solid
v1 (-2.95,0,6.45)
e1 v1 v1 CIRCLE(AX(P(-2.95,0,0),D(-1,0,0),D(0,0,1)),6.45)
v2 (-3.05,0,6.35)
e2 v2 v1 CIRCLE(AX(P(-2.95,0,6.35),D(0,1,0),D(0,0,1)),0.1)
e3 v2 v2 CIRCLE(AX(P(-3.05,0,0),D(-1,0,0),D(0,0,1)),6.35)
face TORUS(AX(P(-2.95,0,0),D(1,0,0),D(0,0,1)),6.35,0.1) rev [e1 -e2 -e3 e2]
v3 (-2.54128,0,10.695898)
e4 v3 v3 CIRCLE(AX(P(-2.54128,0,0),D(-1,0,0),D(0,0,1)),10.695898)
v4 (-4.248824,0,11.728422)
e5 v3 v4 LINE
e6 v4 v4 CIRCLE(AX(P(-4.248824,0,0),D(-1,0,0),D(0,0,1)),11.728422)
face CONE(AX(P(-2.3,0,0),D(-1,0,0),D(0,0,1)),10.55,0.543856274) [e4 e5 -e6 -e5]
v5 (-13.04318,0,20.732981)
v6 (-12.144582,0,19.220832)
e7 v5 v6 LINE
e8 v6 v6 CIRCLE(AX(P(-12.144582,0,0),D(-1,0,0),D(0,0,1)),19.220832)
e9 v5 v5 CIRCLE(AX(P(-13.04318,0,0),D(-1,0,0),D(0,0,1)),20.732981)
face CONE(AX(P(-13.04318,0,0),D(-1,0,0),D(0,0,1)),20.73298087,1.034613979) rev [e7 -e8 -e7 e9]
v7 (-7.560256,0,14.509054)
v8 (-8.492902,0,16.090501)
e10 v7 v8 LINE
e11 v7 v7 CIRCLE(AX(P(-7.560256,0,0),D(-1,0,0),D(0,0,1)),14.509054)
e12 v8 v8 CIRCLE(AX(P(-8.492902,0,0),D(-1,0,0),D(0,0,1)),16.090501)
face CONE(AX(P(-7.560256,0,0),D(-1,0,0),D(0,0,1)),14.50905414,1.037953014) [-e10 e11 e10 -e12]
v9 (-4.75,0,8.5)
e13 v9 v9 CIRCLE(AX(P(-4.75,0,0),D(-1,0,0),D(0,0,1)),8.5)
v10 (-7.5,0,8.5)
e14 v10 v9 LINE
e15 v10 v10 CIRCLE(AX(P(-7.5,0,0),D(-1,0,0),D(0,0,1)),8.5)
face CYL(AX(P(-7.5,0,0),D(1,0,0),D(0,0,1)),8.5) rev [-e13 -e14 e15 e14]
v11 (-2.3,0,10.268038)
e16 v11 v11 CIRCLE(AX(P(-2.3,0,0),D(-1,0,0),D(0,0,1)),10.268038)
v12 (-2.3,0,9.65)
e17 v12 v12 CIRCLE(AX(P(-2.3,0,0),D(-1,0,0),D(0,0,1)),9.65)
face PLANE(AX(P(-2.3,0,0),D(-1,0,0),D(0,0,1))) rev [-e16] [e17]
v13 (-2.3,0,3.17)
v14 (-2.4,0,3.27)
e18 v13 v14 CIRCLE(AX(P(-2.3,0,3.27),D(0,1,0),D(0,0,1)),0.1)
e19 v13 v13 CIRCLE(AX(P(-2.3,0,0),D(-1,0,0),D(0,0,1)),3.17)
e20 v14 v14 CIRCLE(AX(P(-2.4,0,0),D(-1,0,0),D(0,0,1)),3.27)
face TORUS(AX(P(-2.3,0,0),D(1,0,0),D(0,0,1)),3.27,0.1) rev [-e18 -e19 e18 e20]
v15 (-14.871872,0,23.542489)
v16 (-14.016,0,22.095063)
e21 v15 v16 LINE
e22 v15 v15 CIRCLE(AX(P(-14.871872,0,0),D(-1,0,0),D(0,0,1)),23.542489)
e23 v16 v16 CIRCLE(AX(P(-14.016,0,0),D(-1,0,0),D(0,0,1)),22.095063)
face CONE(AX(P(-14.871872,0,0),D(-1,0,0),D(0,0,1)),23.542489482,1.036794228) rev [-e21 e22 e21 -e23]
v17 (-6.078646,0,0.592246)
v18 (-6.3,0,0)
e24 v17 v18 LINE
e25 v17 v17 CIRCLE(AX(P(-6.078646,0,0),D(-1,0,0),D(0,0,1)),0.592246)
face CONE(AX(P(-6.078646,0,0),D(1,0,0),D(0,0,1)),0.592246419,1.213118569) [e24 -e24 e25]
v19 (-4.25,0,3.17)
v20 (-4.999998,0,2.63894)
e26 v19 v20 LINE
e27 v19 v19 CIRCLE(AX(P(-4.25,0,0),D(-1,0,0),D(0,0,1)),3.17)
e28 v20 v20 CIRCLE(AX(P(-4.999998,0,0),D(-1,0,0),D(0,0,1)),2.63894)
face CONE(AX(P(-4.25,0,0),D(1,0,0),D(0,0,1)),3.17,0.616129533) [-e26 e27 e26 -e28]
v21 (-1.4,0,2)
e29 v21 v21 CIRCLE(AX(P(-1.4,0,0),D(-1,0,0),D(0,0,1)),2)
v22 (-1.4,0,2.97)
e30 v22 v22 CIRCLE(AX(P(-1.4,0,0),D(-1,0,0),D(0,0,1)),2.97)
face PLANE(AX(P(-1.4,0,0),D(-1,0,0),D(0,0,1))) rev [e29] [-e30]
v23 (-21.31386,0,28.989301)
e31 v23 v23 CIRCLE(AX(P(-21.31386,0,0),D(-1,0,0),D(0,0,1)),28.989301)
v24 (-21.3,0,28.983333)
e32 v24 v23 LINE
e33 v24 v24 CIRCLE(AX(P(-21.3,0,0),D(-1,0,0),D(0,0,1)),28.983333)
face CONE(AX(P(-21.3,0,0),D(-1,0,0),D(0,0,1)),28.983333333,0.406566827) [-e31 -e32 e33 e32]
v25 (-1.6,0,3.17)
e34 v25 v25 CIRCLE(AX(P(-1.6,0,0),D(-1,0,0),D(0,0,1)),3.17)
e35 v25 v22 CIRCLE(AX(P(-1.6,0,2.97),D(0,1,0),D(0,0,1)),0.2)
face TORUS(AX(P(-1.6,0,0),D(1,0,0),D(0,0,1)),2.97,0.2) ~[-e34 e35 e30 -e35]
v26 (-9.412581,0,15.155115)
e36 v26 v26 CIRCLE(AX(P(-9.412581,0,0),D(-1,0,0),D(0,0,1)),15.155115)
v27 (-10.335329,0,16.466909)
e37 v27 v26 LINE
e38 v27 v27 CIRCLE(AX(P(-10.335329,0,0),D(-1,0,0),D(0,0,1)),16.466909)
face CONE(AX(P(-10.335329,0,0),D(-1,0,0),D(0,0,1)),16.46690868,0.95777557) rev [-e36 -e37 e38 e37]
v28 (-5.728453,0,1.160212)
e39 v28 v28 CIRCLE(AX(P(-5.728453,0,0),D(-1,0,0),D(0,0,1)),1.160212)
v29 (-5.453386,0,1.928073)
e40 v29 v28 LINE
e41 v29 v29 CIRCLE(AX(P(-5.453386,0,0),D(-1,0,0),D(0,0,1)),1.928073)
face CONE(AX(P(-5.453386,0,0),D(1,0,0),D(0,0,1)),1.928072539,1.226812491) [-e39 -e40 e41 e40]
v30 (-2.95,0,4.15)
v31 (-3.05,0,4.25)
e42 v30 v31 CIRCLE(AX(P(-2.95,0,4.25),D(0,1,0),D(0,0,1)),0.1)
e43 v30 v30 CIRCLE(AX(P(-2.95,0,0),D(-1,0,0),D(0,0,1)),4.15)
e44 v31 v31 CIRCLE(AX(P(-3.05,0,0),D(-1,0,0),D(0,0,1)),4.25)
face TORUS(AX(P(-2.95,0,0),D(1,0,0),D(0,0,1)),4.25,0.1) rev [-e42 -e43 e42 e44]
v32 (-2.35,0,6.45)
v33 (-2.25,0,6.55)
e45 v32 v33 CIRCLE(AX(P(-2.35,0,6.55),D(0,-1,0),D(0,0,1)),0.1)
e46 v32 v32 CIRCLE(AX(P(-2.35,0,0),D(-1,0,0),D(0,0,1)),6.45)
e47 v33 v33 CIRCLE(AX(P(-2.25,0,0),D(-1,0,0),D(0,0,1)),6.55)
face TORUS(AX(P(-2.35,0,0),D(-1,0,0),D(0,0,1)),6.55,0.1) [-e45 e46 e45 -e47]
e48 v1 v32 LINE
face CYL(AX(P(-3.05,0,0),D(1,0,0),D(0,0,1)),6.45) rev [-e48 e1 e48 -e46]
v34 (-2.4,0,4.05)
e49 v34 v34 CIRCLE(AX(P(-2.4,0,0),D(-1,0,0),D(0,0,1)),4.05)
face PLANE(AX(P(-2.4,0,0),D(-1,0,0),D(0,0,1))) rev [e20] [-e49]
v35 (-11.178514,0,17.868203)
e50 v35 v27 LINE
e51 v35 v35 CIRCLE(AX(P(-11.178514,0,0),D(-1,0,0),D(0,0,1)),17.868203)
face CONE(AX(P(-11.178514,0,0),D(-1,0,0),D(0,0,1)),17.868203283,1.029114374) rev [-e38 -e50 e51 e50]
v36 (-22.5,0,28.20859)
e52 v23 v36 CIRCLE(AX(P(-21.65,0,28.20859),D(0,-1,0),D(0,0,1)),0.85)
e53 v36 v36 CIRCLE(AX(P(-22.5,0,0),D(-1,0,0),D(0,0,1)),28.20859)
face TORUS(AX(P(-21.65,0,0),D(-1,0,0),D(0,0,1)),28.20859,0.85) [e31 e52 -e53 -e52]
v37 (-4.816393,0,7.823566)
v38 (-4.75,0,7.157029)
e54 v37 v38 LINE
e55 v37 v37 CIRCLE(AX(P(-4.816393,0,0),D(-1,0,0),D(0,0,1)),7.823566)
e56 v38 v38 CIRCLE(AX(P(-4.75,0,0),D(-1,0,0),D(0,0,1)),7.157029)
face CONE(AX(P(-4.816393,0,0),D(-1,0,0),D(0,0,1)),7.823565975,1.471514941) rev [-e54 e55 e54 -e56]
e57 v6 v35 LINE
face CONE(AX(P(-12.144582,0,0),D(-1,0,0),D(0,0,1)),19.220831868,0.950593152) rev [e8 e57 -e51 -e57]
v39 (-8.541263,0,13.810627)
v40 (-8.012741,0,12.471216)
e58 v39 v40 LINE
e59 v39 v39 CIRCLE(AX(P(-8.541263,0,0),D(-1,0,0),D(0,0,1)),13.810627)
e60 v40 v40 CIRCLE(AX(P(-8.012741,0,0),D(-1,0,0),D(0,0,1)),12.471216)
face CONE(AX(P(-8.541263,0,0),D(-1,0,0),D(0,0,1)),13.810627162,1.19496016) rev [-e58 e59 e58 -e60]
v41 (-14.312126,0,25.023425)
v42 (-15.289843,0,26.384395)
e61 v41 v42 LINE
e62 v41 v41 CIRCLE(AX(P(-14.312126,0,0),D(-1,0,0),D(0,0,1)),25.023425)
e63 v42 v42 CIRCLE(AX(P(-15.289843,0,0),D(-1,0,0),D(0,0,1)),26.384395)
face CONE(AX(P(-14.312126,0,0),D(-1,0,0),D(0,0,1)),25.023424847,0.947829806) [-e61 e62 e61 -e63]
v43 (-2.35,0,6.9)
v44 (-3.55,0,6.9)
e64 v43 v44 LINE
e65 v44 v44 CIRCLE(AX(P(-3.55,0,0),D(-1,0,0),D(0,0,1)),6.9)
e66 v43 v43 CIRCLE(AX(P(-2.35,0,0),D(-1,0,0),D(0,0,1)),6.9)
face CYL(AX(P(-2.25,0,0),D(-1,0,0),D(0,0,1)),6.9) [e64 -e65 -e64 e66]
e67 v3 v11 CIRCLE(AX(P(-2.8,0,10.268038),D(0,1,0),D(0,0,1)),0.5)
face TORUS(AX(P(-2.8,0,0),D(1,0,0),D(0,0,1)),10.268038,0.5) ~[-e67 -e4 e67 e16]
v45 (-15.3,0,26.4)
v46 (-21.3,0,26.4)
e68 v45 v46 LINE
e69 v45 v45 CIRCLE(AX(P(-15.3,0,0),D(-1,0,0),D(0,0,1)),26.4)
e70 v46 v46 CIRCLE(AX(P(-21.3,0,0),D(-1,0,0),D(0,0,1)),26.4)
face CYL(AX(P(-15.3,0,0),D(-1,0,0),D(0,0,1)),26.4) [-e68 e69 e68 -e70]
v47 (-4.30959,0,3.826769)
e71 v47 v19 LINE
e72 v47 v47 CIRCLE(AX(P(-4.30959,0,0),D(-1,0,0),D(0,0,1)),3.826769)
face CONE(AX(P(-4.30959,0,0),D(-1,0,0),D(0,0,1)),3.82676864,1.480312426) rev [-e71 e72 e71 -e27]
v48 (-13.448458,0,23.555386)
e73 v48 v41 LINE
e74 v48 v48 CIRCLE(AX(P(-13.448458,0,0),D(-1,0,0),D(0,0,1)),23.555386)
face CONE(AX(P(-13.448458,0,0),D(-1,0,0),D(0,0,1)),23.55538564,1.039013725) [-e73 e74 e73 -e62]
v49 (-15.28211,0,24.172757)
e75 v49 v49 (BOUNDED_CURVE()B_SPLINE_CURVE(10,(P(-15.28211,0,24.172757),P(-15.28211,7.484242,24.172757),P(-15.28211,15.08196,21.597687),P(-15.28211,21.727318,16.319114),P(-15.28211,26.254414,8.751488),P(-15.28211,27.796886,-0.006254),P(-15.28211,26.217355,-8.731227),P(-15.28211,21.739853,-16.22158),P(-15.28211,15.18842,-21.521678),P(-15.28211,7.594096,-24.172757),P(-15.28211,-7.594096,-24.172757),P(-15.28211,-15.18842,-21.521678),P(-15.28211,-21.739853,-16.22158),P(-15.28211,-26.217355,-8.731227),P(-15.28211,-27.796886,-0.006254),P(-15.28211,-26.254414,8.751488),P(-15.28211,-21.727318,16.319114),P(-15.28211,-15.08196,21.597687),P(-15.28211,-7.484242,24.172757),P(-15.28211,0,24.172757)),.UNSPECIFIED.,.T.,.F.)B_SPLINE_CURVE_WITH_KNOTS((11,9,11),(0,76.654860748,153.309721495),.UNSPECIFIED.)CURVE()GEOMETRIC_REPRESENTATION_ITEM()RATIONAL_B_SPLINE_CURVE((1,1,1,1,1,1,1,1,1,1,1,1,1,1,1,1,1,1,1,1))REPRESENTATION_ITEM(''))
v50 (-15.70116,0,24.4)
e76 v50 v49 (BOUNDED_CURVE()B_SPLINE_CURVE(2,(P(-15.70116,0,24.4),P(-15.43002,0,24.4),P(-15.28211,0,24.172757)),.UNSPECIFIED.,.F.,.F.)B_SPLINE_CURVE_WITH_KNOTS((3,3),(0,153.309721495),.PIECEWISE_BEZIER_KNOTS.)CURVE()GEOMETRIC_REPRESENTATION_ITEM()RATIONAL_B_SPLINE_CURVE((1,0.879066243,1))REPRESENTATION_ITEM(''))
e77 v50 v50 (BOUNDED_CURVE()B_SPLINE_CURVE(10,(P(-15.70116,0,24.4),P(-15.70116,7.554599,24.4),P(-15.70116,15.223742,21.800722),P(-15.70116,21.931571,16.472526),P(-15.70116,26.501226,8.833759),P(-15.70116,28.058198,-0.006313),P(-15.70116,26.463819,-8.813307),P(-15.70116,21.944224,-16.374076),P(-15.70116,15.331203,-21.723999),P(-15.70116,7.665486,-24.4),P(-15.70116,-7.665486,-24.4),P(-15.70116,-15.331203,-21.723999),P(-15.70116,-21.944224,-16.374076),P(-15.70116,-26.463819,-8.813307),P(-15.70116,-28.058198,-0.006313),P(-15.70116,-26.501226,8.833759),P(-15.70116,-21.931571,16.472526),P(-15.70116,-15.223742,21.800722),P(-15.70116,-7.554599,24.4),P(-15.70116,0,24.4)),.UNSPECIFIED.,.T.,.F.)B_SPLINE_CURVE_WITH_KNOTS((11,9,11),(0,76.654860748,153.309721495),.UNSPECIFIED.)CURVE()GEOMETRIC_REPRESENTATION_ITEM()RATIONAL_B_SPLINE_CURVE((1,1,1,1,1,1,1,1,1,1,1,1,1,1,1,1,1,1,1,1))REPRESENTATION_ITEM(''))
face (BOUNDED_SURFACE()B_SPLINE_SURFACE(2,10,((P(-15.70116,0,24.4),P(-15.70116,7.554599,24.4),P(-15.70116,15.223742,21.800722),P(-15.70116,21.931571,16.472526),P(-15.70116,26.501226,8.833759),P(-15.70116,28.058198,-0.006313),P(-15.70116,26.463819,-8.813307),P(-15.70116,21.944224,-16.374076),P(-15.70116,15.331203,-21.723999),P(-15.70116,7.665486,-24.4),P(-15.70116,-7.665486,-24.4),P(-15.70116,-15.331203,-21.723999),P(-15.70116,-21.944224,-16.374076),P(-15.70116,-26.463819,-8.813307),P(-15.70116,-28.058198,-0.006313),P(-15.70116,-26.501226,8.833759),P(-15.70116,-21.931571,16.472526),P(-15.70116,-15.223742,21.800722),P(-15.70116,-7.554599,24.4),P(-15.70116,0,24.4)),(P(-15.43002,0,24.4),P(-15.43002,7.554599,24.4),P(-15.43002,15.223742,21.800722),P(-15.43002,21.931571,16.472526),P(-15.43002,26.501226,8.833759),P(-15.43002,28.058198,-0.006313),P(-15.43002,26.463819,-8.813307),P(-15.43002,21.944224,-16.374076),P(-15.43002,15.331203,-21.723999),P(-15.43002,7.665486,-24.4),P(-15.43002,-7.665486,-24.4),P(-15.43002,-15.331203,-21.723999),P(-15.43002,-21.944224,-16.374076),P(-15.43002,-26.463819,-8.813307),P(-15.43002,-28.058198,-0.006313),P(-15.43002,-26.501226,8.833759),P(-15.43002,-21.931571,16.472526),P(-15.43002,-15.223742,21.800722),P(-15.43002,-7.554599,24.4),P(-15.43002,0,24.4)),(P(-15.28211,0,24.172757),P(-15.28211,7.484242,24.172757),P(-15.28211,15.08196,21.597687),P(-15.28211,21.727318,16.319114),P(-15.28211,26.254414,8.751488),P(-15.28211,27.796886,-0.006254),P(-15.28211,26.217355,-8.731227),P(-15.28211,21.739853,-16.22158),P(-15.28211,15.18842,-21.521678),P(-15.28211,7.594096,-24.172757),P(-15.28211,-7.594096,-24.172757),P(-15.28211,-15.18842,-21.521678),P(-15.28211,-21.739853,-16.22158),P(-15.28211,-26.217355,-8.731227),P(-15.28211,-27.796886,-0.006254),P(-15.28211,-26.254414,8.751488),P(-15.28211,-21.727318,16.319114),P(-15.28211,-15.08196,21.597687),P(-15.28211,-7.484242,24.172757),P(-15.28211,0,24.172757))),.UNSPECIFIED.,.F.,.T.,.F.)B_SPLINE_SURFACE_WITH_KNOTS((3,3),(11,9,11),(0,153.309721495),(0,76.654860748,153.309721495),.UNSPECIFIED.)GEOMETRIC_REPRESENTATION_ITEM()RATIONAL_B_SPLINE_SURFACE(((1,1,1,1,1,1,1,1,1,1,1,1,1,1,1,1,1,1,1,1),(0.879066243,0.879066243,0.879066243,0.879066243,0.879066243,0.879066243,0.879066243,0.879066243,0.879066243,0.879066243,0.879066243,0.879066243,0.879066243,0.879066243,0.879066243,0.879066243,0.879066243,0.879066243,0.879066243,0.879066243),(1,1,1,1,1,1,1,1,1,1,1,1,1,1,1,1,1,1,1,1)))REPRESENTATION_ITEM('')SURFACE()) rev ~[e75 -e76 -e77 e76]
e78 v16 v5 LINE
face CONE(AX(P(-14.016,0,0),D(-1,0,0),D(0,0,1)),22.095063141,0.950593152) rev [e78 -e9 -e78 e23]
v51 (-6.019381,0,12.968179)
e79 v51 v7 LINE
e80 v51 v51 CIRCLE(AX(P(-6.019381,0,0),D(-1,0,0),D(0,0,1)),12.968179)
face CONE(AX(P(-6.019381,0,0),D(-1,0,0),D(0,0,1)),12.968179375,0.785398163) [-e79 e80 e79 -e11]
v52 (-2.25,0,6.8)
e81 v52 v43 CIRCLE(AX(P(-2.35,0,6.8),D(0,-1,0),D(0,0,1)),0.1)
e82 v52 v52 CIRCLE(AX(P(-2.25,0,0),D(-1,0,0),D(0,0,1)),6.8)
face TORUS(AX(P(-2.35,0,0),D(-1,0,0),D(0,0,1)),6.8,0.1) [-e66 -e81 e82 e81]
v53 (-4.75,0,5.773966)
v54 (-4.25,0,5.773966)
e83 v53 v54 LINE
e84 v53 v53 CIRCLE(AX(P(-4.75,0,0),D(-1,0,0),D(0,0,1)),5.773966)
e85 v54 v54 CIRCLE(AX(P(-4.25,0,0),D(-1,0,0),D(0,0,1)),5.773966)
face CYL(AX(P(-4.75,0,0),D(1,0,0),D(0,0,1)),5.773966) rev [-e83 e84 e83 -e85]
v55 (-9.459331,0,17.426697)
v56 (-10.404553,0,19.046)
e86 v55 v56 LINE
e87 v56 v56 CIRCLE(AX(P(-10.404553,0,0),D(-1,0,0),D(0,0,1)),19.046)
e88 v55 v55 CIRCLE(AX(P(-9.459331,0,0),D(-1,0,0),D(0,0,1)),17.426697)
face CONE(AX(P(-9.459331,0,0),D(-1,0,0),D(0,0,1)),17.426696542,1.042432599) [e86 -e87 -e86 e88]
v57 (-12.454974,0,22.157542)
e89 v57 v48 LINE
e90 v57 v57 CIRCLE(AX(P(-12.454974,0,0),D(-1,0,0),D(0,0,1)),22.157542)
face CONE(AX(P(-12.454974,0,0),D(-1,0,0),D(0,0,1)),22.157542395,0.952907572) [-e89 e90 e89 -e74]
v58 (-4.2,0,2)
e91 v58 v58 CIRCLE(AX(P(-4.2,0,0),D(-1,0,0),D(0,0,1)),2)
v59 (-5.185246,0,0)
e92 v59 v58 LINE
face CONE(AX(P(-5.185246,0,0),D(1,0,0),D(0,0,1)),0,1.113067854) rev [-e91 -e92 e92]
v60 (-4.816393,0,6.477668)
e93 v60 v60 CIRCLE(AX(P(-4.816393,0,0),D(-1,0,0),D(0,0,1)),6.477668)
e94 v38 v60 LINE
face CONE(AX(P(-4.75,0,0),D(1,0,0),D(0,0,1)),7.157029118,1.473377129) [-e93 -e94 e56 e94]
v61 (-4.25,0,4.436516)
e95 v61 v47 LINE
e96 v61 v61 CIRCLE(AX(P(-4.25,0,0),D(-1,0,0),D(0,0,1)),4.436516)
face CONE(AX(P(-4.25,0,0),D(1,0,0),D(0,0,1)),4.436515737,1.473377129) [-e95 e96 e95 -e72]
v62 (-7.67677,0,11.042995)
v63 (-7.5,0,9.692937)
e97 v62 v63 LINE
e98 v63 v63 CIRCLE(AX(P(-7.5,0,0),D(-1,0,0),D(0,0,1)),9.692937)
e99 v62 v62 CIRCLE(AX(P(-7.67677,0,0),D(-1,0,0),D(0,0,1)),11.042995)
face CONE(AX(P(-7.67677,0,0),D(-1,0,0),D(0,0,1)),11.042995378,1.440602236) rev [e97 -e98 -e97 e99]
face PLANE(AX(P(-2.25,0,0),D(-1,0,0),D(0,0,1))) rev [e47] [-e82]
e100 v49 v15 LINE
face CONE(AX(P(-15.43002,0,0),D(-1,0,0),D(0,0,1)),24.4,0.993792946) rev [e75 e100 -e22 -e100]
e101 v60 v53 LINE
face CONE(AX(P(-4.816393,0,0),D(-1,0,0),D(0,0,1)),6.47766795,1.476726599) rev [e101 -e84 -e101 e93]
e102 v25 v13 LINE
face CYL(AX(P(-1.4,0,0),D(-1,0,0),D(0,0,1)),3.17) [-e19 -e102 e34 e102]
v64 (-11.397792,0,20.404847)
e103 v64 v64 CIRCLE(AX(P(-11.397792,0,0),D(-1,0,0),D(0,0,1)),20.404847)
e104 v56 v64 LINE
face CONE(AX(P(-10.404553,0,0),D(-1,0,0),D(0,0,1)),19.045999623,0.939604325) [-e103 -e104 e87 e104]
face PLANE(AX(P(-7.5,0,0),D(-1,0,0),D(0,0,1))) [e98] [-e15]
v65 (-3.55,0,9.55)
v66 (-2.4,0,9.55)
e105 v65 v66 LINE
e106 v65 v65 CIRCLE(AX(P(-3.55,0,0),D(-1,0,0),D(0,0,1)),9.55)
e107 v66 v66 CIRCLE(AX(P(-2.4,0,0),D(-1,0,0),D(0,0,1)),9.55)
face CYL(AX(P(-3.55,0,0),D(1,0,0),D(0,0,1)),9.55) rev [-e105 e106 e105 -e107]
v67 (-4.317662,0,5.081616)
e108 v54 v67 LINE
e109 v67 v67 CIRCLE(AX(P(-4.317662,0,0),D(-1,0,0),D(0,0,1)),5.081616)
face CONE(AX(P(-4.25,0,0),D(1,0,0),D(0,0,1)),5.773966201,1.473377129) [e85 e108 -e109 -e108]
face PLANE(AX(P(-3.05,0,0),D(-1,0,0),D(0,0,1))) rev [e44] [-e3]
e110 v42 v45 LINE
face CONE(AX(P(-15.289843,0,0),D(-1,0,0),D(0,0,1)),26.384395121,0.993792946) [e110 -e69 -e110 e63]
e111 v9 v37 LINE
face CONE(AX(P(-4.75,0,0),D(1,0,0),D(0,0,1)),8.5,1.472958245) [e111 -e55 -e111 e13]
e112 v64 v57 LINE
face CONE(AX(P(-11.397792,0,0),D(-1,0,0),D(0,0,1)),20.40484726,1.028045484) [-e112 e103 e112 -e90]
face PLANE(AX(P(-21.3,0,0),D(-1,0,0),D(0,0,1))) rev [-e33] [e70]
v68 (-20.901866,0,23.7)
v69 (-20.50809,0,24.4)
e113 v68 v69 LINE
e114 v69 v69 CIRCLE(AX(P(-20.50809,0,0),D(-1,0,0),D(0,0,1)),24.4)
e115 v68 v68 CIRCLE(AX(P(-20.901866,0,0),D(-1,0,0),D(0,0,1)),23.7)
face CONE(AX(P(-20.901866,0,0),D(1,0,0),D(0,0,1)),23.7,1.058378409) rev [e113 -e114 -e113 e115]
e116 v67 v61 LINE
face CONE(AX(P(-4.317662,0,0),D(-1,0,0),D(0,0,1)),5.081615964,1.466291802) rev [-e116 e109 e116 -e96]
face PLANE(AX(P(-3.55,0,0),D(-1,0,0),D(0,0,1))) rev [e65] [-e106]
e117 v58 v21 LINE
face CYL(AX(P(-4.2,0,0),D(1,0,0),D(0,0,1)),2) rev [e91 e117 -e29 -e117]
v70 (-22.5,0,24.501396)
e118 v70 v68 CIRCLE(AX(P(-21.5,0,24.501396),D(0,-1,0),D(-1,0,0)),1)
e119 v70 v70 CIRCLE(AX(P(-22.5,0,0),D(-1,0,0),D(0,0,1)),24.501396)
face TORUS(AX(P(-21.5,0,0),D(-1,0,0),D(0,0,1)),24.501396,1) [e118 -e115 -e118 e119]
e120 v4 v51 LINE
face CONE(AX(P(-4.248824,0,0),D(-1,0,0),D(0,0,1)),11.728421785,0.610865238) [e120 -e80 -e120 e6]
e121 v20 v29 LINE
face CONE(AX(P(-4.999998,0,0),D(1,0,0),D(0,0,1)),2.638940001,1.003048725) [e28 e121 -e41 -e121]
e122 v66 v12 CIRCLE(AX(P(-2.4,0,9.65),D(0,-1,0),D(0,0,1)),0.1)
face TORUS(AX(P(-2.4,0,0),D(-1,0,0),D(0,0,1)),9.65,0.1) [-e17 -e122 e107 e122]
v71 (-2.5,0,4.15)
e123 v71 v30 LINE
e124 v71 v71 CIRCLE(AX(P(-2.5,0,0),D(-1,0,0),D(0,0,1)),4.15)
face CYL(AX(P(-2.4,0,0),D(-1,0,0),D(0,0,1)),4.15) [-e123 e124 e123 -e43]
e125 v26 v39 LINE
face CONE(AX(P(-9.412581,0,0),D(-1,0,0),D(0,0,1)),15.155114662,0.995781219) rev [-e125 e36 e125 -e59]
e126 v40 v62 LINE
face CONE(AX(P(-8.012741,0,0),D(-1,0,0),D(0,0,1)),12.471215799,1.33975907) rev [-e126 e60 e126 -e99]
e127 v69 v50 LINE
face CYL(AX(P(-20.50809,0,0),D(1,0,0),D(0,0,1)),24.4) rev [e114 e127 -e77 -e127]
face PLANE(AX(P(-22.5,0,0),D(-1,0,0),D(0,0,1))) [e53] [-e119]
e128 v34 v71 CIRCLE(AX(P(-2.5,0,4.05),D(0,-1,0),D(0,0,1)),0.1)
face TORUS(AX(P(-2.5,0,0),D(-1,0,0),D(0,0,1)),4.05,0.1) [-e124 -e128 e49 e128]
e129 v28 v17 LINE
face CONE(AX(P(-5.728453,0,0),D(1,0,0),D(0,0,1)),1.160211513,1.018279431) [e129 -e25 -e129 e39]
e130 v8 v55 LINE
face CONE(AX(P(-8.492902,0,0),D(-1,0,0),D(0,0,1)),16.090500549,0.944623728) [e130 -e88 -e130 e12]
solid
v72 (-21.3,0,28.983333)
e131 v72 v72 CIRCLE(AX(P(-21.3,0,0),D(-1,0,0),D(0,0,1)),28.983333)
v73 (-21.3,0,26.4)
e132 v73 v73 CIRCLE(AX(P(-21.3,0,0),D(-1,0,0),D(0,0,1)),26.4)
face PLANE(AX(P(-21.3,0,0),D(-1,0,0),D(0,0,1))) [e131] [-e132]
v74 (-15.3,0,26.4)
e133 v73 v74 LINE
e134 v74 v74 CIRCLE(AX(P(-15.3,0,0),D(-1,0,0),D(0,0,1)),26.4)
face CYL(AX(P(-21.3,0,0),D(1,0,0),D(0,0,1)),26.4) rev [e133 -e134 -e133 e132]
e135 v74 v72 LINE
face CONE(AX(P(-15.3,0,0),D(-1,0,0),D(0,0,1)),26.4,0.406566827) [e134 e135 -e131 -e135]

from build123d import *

# Parameters (mm, degrees)
F2_R = 0.1
F3_R = 0.2
F4_R = 0.5
F5_R = 0.5
F8_R = 0.85


with BuildPart() as f1:
    # F0 (on Front) → F1 (revolve)
    with BuildSketch(Plane.XZ):
        with BuildLine():
            Line((-4.2, 2), (-1.4, 2))
            Line((-1.4, 2), (-1.4, 3.17))
            Line((-1.4, 3.17), (-2.4, 3.17))
            Line((-2.4, 3.17), (-2.4, 4.15))
            Line((-2.4, 4.15), (-3.05, 4.15))
            Line((-3.05, 4.15), (-3.05, 6.45))
            Line((-3.05, 6.45), (-2.25, 6.45))
            Line((-2.25, 6.45), (-2.25, 6.9))
            Line((-2.25, 6.9), (-3.55, 6.9))
            Line((-3.55, 6.9), (-3.55, 9.55))
            Line((-3.55, 9.55), (-2.3, 9.55))
            Line((-2.3, 9.55), (-2.3, 10.55))
            Line((-2.3, 10.55), (-4.2488235049, 11.7284217849))
            Line((-4.2488235049, 11.7284217849), (-6.0193808361, 12.9681793751))
            Line((-6.0193808361, 12.9681793751), (-7.5602556007, 14.5090541396))
            Line((-7.5602556007, 14.5090541396), (-9.4593313096, 17.4266965415))
            Line((-9.4593313096, 17.4266965415), (-11.397791514, 20.4048472599))
            Line((-11.397791514, 20.4048472599), (-13.4484577999, 23.5553856402))
            Line((-13.4484577999, 23.5553856402), (-15.2898428789, 26.3843951207))
            Line((-15.2898428789, 26.3843951207), (-15.3, 26.4))
            Line((-15.3, 26.4), (-21.3, 26.4))
            Line((-21.3, 26.4), (-21.3, 28.9833333333))
            Line((-21.3, 28.9833333333), (-22.5, 29.5))
            Line((-22.5, 29.5), (-22.5, 24.5013962977))
            ThreePointArc((-22.5, 24.5013962977), (-21.9482556511, 23.6074908938), (-20.9018662575, 23.7))
            Line((-20.9018662575, 23.7), (-20.5080900341, 24.4))
            Line((-20.5080900341, 24.4), (-15.4300203026, 24.4))
            Line((-15.4300203026, 24.4), (-14.8718719174, 23.5424894817))
            Line((-14.8718719174, 23.5424894817), (-13.0431798353, 20.7329808699))
            Line((-13.0431798353, 20.7329808699), (-11.1785135129, 17.8682032825))
            Line((-11.1785135129, 17.8682032825), (-9.4125806174, 15.1551146623))
            Line((-9.4125806174, 15.1551146623), (-8.5412627086, 13.8106271625))
            Line((-8.5412627086, 13.8106271625), (-8.0127408728, 12.4712157995))
            Line((-8.0127408728, 12.4712157995), (-7.6767695136, 11.0429953784))
            Line((-7.6767695136, 11.0429953784), (-7.5, 9.6929371357))
            Line((-7.5, 9.6929371357), (-7.5, 8.5))
            Line((-7.5, 8.5), (-4.75, 8.5))
            Line((-4.75, 8.5), (-4.8163929872, 7.8235659748))
            Line((-4.8163929872, 7.8235659748), (-4.75, 7.1570291184))
            Line((-4.75, 7.1570291184), (-4.8163929872, 6.4776679501))
            Line((-4.8163929872, 6.4776679501), (-4.75, 5.7739662006))
            Line((-4.75, 5.7739662006), (-4.25, 5.7739662006))
            Line((-4.25, 5.7739662006), (-4.3176623901, 5.0816159641))
            Line((-4.3176623901, 5.0816159641), (-4.25, 4.4365157373))
            Line((-4.25, 4.4365157373), (-4.3095897044, 3.8267686403))
            Line((-4.3095897044, 3.8267686403), (-4.25, 3.17))
            Line((-4.25, 3.17), (-4.9999979152, 2.6389400014))
            Line((-4.9999979152, 2.6389400014), (-5.4533858784, 1.9280725392))
            Line((-5.4533858784, 1.9280725392), (-5.7284533243, 1.1602115126))
            Line((-5.7284533243, 1.1602115126), (-6.078645587, 0.5922464188))
            Line((-6.078645587, 0.5922464188), (-6.3, 0))
            Line((-6.3, 0), (-5.1852456548, 0))
            Line((-5.1852456548, 0), (-4.2, 2))
        make_face()
        Polygon((-9.4593313096, 17.4266965415), (-7.5602556007, 14.5090541396), (-8.4929022586, 16.0905005494), align=None)
        Polygon((-11.397791514, 20.4048472599), (-9.4593313096, 17.4266965415), (-10.4045527072, 19.0459996231), align=None)
        Polygon((-13.4484577999, 23.5553856402), (-11.397791514, 20.4048472599), (-12.4549735292, 22.1575423946), align=None)
        Polygon((-15.2898428789, 26.3843951207), (-13.4484577999, 23.5553856402), (-14.3121259439, 25.0234248466), align=None)
        Polygon((-10.3353289936, 16.4669086803), (-9.4125806174, 15.1551146623), (-11.1785135129, 17.8682032825), align=None)
        Polygon((-12.1445821899, 19.2208318679), (-11.1785135129, 17.8682032825), (-13.0431798353, 20.7329808699), align=None)
        Polygon((-14.0160004839, 22.095063141), (-13.0431798353, 20.7329808699), (-14.8718719174, 23.5424894817), align=None)
    revolve(axis=Axis((-5.7426228274, 0, 0), (-1, 0, 0)))

    # F2
    f2_edges = [f1.edges().sort_by_distance(p)[0] for p in [
        (-2.4, 0, -4.15),
        (-3.05, 0, -4.15),
        (-2.25, 0, -6.45),
        (-2.25, 0, -6.9),
        (-2.3, 0, -9.55),
        (-3.05, 0, -6.45),
        (-2.4, 0, -3.17),
    ]]
    fillet(f2_edges, radius=F2_R)

    # F3
    f3_edges = [f1.edges().sort_by_distance(p)[0] for p in [
        (-1.4, 0, -3.17),
    ]]
    fillet(f3_edges, radius=F3_R)

    # F4
    f4_edges = [f1.edges().sort_by_distance(p)[0] for p in [
        (-15.43002, 0, -24.4),
    ]]
    fillet(f4_edges, radius=F4_R)

    # F5
    f5_edges = [f1.edges().sort_by_distance(p)[0] for p in [
        (-2.3, 0, -10.55),
    ]]
    fillet(f5_edges, radius=F5_R)

    # F8
    f8_edges = [f1.edges().sort_by_distance(p)[0] for p in [
        (-22.5, 0, -29.5),
    ]]
    fillet(f8_edges, radius=F8_R)


with BuildPart() as f7:
    # F6 (on Front) → F7 (revolve)
    with BuildSketch(Plane.XZ):
        Polygon((-21.3, 28.9833333333), (-21.3, 26.4), (-15.3, 26.4), align=None)
    revolve(axis=Axis((-13.7036303058, 0, 0), (-1, 0, 0)))


solid = Compound([f1.part, f7.part])
